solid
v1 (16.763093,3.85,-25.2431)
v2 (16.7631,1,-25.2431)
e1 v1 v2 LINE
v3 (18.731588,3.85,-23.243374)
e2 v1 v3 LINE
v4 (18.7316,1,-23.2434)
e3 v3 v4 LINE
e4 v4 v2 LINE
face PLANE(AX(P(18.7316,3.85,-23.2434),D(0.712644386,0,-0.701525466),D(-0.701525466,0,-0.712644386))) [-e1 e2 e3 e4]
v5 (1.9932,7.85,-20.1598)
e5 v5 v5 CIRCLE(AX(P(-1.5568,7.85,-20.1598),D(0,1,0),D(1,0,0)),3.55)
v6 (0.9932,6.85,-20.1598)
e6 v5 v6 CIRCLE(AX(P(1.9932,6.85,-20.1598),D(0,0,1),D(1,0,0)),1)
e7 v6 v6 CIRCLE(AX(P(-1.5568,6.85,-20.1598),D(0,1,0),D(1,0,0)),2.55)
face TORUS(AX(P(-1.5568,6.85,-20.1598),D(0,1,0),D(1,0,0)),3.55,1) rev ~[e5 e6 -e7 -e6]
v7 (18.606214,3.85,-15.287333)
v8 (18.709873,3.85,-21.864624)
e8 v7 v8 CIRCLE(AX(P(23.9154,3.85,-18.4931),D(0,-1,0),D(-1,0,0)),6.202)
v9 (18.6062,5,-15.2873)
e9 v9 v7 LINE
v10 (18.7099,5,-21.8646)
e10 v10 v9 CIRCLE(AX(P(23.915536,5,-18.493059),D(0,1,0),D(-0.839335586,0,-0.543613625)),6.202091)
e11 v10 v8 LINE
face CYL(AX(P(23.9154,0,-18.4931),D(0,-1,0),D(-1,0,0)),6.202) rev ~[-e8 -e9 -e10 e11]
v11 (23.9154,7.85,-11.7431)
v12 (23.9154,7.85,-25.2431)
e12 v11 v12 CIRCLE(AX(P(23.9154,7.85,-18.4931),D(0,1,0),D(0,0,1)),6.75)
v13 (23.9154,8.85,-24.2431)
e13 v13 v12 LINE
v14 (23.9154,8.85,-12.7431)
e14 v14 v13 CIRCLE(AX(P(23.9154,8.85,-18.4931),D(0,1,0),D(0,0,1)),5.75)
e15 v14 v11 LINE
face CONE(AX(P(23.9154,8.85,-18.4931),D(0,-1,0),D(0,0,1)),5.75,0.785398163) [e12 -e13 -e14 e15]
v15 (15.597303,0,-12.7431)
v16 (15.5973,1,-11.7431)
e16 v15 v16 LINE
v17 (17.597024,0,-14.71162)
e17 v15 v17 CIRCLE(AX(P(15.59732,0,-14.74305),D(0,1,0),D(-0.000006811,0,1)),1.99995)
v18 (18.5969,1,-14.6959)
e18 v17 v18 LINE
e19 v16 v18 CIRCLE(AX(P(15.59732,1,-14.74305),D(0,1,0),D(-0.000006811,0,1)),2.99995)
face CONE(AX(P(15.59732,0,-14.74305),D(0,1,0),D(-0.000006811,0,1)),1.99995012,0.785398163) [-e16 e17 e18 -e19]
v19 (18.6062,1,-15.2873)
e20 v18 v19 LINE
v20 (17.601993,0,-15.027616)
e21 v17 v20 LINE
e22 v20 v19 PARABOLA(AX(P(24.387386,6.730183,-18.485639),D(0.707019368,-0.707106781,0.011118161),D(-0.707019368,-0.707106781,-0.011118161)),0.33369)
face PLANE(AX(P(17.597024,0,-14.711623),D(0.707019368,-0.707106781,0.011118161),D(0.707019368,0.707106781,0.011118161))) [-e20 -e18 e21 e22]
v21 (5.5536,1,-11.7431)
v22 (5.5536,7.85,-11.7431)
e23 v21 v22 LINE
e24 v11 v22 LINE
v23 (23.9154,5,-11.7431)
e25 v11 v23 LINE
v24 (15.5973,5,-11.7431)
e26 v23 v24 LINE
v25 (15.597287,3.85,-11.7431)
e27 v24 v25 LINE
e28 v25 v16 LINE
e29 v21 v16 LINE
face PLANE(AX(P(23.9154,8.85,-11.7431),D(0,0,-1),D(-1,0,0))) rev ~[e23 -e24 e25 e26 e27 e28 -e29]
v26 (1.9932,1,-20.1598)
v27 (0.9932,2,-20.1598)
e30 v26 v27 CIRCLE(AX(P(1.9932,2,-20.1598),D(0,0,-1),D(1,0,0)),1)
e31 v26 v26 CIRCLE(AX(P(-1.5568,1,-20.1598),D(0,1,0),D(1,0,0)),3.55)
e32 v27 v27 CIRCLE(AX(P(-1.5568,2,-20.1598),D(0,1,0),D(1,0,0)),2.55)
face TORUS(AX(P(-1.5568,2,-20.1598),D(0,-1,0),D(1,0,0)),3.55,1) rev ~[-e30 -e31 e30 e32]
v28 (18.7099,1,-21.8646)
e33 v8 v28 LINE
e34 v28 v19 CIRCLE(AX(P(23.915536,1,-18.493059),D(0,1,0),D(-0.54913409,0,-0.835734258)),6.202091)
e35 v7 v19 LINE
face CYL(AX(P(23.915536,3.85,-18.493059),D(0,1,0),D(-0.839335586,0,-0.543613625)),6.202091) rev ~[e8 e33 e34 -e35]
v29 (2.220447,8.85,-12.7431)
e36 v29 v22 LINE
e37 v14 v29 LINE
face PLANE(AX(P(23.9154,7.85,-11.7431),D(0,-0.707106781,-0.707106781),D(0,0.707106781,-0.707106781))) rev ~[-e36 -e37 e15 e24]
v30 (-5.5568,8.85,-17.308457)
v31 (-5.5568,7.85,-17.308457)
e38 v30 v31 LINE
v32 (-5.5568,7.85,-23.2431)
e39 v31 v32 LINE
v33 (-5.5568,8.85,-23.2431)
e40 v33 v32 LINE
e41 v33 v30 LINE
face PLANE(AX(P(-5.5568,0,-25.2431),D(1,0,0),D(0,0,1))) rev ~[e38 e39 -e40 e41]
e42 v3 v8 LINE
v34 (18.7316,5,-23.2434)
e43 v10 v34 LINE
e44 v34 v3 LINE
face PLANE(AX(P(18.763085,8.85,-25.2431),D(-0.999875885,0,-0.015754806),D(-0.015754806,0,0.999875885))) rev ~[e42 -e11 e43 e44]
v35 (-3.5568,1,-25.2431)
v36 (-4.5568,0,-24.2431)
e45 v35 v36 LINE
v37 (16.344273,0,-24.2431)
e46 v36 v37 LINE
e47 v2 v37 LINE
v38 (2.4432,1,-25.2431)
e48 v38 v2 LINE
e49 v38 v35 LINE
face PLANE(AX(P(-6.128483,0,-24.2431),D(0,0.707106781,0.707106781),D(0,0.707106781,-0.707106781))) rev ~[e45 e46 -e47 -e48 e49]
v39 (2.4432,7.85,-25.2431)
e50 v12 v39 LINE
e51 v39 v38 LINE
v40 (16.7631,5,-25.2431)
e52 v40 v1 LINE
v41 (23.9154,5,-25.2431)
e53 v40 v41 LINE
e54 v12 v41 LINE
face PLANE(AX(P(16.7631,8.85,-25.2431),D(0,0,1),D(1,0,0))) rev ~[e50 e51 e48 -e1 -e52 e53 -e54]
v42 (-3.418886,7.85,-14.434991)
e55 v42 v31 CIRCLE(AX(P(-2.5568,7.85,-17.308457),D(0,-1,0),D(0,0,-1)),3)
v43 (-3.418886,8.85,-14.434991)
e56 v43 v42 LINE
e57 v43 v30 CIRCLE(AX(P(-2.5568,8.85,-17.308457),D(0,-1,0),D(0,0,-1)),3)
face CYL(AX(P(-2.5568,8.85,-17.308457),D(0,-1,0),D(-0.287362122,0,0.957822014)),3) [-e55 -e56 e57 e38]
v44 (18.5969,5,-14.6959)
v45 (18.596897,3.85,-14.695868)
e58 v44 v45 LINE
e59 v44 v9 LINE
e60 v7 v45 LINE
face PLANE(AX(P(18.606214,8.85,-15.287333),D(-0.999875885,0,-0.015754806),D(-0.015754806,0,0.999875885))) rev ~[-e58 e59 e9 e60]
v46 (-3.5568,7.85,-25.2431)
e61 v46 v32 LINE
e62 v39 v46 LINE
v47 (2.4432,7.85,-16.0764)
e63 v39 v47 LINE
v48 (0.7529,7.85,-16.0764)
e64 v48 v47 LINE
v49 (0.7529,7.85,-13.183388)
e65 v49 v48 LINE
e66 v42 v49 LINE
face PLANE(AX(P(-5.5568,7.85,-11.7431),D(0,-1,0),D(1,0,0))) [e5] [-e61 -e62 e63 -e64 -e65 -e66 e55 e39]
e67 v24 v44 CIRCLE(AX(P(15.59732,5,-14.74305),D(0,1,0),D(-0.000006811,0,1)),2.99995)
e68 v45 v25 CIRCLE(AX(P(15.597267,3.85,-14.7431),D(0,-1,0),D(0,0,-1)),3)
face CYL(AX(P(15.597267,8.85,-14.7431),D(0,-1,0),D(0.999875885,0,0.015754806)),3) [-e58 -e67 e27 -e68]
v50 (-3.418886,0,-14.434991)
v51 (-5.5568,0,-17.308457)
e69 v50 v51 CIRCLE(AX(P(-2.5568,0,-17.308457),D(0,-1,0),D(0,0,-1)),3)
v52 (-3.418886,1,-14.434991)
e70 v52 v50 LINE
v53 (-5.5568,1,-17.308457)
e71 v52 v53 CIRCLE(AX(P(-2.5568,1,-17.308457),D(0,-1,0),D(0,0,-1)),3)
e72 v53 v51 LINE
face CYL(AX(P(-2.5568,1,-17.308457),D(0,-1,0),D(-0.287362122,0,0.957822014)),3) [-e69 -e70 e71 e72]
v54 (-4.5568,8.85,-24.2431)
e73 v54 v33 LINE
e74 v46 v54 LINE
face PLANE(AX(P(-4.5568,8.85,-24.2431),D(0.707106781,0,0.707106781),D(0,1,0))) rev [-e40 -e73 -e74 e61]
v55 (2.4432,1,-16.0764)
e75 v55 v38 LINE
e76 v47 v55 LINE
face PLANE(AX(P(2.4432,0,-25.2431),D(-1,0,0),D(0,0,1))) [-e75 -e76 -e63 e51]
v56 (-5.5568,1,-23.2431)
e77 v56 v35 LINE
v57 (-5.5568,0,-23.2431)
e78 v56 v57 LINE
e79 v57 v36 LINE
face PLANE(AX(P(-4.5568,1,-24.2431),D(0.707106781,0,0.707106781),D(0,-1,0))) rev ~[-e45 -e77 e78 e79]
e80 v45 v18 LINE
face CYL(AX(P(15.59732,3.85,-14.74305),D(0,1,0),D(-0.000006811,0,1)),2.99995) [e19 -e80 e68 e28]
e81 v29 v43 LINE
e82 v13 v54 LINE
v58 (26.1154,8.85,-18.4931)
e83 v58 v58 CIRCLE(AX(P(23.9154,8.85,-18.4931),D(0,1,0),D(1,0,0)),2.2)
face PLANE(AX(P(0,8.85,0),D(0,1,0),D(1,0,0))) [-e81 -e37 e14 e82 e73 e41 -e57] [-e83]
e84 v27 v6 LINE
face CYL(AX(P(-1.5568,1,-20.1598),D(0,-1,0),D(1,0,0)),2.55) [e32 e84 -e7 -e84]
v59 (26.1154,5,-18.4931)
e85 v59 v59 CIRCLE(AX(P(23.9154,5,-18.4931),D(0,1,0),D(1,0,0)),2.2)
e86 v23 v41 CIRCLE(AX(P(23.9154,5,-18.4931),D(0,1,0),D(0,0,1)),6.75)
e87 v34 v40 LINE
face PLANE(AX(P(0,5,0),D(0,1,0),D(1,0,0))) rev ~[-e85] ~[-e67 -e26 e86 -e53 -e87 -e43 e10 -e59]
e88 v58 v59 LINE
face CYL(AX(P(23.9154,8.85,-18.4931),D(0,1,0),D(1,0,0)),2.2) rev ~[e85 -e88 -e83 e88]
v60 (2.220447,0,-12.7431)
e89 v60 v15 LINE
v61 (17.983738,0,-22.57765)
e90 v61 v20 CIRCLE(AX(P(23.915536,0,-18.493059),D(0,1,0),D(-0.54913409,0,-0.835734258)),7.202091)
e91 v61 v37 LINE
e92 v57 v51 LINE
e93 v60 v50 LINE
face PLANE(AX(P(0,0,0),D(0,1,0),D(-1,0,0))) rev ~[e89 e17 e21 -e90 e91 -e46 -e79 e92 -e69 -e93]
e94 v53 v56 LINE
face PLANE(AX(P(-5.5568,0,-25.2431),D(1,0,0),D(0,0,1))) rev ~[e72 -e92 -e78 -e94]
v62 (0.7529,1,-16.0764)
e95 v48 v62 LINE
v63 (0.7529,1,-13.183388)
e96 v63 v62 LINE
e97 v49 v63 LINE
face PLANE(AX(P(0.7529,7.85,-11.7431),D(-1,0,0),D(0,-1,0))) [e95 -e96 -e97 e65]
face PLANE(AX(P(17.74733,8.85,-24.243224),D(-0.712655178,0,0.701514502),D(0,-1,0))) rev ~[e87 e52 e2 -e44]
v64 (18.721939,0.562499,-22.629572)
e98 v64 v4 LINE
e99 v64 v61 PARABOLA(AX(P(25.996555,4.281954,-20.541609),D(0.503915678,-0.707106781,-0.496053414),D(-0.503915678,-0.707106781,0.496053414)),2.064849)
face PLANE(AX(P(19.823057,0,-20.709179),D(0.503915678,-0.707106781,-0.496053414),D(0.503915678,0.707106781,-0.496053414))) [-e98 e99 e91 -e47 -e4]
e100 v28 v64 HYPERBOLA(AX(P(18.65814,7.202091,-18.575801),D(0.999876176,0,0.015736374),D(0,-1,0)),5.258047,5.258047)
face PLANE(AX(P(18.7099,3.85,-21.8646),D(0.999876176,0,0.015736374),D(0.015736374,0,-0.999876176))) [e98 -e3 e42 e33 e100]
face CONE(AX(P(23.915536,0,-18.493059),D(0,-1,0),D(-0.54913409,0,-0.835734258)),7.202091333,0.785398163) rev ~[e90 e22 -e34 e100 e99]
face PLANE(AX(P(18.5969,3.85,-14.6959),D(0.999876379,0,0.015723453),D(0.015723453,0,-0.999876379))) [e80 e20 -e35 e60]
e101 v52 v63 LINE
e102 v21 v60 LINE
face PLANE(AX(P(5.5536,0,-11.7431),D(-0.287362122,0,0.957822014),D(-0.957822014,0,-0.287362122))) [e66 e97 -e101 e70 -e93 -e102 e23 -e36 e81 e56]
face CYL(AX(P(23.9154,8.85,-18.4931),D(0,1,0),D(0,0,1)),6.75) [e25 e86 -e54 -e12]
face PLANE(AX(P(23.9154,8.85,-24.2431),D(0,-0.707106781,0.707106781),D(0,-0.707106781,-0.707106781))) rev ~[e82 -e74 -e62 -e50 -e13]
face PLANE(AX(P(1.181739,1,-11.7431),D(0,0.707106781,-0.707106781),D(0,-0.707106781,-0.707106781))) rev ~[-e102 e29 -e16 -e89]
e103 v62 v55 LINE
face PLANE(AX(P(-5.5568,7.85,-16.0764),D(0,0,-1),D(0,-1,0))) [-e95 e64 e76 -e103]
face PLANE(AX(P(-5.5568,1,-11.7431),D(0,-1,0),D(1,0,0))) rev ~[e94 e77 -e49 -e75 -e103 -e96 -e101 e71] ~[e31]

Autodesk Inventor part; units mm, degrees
ref_plane "YZ Plane" through (0, 0, 0) normal (1, 0, 0) x (0, 1, 0)
ref_plane "XZ Plane" through (0, 0, 0) normal (0, 1, 0) x (-1, 0, 0)
ref_plane "XY Plane" through (0, 0, 0) normal (0, 0, 1) x (1, 0, 0)
sketch "Sketch2" plane through (0, 0, 0) normal (0, 1, 0) x (-1, 0, 0)
  line L0 (-5.5536, -11.7431) -> (5.5568, -15.0764)
  line L1 (5.5568, -25.2431) -> (-23.9154, -25.2431)
  line L2 (-23.9154, -25.2431) -> (-23.9154, -11.7431)
  line L3 (-5.5536, -11.7431) -> (-23.9154, -11.7431)
  line L4 (5.5568, -25.2431) -> (5.5568, -15.0764)
  circle A0 centre (-23.9154, -18.4931) radius 6.75
  circle A1 centre (-23.9154, -18.4931) radius 2.2
  circle A2 centre (-23.9154, -18.4931) radius 6.202
  circle A3 centre (-24.9154, -18.9931) radius 6.25
  line L5 (-18.8553, -31.0955) -> (-18.419, -3.4058)
  point P0 (0, 0)
  point P1 (0, 0)
  point P2 (-19.4912, -10.8803)
  point P3 (-19.4912, -24.3803)
  point P4 (-23.9154, -12.2912)
  point P5 (-23.9154, -24.6951)
  dimension "d1" = 13.5
  dimension "d0" = 4.4
  dimension "d6" = 0.5
  dimension "d7" = 1
  dimension "d8" = 12.5
extrude "Extrusion1" add sketch "Sketch2" along normal blind 3.85 contours L0 L4 L1 L5 A0 L3 | L5 A0 L3 | A0 L5 A2 L2 | L2 A2 A3 A0 | A0 L5 A2 | L1 A0 L5 | A2 L5 A3 L2 | L2 A3 A2 | A3 A2 L2 A0 | L5 A2 A3 | A2 L5 | A0 A3 L2 | L2 A3 A2 L5 A0 | A3 A2 L2 A1 | L2 A1 A2 A3 | L2 A2 A3
extrude "Extrusion2" add sketch "Sketch2" along normal blind 8.85 contours L0 L4 L1 L5 A0 L3 | L5 A0 L3 | A0 L5 A2 L2 | A0 L5 A2 | L1 A0 L5 | L2 A3 A2 L5 A0 | L2 A2 A3 picked at (-23.6214, -24.9369)
sketch "Sketch3" plane through (0, 8.85, 0) normal (0, 1, 0) x (1, 0, 0)
  line L0 (-5.5568, 25.2431) -> (-5.5568, 15.0764) projected
  line L1 (-5.5568, 15.0764) -> (5.5536, 11.7431) projected
  line L2 (5.5536, 11.7431) -> (23.9154, 11.7431) projected
  line L3 (23.9154, 11.7431) -> (23.9154, 12.2912) projected
  arc A0 (23.9154, 24.6951) -> (23.9154, 12.2912) centre (23.9154, 18.4931) ccw projected
  line L4 (23.9154, 24.6951) -> (23.9154, 25.2431) projected
  line L5 (23.9154, 25.2431) -> (-5.5568, 25.2431) projected
  line L6 (18.8553, 31.0955) -> (18.419, 3.4058) projected
  point P0 (0, 0)
  point P1 (18.6062, 15.2873)
  point P2 (18.5504, 11.7431)
  point P3 (18.7631, 25.2431)
  point P4 (18.7099, 21.8646)
extrude "Extrusion3" cut sketch "Sketch3" against normal up to surface (5 mm away) contours L5 L4 A0 L6 | L6 A0 L3 L2
sketch "Sketch4" plane through (-5.5568, 0, -25.2431) normal (-1, 0, 0) x (0, 0, 1)
  line L0 (0, 0) -> (10.1667, 0) projected
  line L1 (10.1667, 0) -> (10.1667, 8.85) projected
  line L2 (0, 8.85) -> (10.1667, 8.85) projected
  line L3 (0, 0) -> (0, 8.85) projected
  line L4 (9.1667, 7.85) -> (9.1667, 1)
  line L5 (9.1667, 1) -> (1, 1)
  line L6 (1, 1) -> (1, 7.85)
  line L7 (1, 7.85) -> (9.1667, 7.85)
  point P0 (25.2431, 0)
  dimension "d11" = 1
extrude "Extrusion4" cut sketch "Sketch4" against normal blind 8 contours L4 L5 L6 L7
sketch "Sketch5" plane through (-5.5568, 1, -16.0764) normal (0, 1, 0) x (1, 0, 0)
  line L0 (0, 0) -> (0, 8.1667) projected
  line L1 (0, 0) -> (8, 0) projected
  line L2 (8, 0) -> (8, 8.1667) projected
  line L3 (0, 8.1667) -> (8, 8.1667) projected
  line L4 (8, 4.0834) -> (2.9855, 4.0834) construction
  line L5 (4, 0) -> (4, 4.0834) construction
  circle A0 centre (4, 4.0834) radius 2.55
  point P0 (5.5568, -16.0764)
  dimension "d14" = 5.1
extrude "Extrusion5" add sketch "Sketch5" along normal up to surface (6.85 mm away) contours A0
sketch "Sketch6" plane through (5.5536, 0, -11.7431) normal (0, 0, 1) x (1, 0, 0)
  line L0 (-11.1104, 7.85) -> (-11.1104, 1) projected
  line L1 (-11.1104, 7.85) -> (-4.8007, 7.85)
  line L2 (-4.8007, 7.85) -> (-4.8007, 1)
  line L3 (-11.1104, 1) -> (-4.8007, 1)
  point P0 (-5.5536, 0)
extrude "Extrusion6" cut sketch "Sketch6" against normal up to surface (4.3333 mm away)
sketch "Sketch7" plane through (-5.5568, 1, -24.2431) normal (0, 0, 1) x (1, 0, 0)
  line L0 (0, 0) -> (0, 6.85) projected
  line L1 (0, 0) -> (8, 0) projected
  line L2 (8, 0) -> (8, 6.85) projected
  line L3 (0, 6.85) -> (8, 6.85) projected
  point P0 (5.5568, -1)
extrude "Extrusion7" cut sketch "Sketch7" against normal blind 10.25
sketch "Sketch8" plane through (0, 8.85, 0) normal (0, 1, 0) x (1, 0, 0)
  circle A0 centre (-1.5568, 20.1598) radius 2.55 projected
  circle A1 centre (-1.5568, 20.1598) radius 2.55 projected
  line L0 (-5.5568, 25.2431) -> (2.4432, 25.2431) projected
  point P0 (0, 0)
fillet "Fillet1" radius 3 2 edges at (-5.5568, 8.35, -15.0764) (-5.5568, 0.5, -15.0764)
chamfer "Chamfer1" distance 2 angle 45 2 edges at (-5.5568, 8.35, -25.2431) (-5.5568, 0.5, -25.2431)
chamfer "Chamfer2" distance 2 angle 45 1 edges at (18.7631, 6.35, -25.2431)
fillet "Fillet2" radius 3 1 edges at (18.5504, 6.35, -11.7431)
sketch "Sketch9" plane through (0, 3.85, 0) normal (0, 1, 0) x (1, 0, 0)
  arc A0 (23.9154, 11.7431) -> (23.9154, 25.2431) centre (23.9154, 18.4931) ccw projected
  line L0 (16.7631, 25.2431) -> (23.9154, 25.2431) projected
  line L1 (18.7316, 23.2434) -> (16.7631, 25.2431) projected
  line L2 (18.7099, 21.8646) -> (18.7316, 23.2434) projected
  arc A1 (18.7099, 21.8646) -> (18.6062, 15.2873) centre (23.9154, 18.4931) ccw projected
  line L3 (18.5969, 14.6959) -> (18.6062, 15.2873) projected
  arc A2 (15.5973, 11.7431) -> (18.5969, 14.6959) centre (15.5973, 14.7431) ccw projected
  line L4 (23.9154, 11.7431) -> (15.5973, 11.7431) projected
  circle A3 centre (23.9154, 18.4931) radius 2.2 projected
  point P0 (0, 0)
extrude "Extrusion8" add sketch "Sketch9" against normal blind 3.85 from surface at 5
extrude "Extrusion9" cut sketch "Sketch9" against normal blind 10
chamfer "Chamfer4" distance 1 angle 45 9 edges at (17.7142, 0, -18.5909) (17.7018, 0, -12.6052) (10.5754, 0, -11.7431) (18.6016, 0, -14.9916) (17.7474, 0, -24.2433) (6.6031, 0, -25.2431) (10.1793, 8.85, -25.2431) (30.6654, 8.85, -18.4931) (14.7345, 8.85, -11.7431)
fillet "Fillet3" radius 1 2 edges at (-4.1068, 7.85, -20.1598) (-4.1068, 1, -20.1598)
ref_plane "Work Plane1" through (0, 4.425, 0) normal (0, -1, 0) x (1, 0, 0)
properties part number "Upper Leg_oposite"
